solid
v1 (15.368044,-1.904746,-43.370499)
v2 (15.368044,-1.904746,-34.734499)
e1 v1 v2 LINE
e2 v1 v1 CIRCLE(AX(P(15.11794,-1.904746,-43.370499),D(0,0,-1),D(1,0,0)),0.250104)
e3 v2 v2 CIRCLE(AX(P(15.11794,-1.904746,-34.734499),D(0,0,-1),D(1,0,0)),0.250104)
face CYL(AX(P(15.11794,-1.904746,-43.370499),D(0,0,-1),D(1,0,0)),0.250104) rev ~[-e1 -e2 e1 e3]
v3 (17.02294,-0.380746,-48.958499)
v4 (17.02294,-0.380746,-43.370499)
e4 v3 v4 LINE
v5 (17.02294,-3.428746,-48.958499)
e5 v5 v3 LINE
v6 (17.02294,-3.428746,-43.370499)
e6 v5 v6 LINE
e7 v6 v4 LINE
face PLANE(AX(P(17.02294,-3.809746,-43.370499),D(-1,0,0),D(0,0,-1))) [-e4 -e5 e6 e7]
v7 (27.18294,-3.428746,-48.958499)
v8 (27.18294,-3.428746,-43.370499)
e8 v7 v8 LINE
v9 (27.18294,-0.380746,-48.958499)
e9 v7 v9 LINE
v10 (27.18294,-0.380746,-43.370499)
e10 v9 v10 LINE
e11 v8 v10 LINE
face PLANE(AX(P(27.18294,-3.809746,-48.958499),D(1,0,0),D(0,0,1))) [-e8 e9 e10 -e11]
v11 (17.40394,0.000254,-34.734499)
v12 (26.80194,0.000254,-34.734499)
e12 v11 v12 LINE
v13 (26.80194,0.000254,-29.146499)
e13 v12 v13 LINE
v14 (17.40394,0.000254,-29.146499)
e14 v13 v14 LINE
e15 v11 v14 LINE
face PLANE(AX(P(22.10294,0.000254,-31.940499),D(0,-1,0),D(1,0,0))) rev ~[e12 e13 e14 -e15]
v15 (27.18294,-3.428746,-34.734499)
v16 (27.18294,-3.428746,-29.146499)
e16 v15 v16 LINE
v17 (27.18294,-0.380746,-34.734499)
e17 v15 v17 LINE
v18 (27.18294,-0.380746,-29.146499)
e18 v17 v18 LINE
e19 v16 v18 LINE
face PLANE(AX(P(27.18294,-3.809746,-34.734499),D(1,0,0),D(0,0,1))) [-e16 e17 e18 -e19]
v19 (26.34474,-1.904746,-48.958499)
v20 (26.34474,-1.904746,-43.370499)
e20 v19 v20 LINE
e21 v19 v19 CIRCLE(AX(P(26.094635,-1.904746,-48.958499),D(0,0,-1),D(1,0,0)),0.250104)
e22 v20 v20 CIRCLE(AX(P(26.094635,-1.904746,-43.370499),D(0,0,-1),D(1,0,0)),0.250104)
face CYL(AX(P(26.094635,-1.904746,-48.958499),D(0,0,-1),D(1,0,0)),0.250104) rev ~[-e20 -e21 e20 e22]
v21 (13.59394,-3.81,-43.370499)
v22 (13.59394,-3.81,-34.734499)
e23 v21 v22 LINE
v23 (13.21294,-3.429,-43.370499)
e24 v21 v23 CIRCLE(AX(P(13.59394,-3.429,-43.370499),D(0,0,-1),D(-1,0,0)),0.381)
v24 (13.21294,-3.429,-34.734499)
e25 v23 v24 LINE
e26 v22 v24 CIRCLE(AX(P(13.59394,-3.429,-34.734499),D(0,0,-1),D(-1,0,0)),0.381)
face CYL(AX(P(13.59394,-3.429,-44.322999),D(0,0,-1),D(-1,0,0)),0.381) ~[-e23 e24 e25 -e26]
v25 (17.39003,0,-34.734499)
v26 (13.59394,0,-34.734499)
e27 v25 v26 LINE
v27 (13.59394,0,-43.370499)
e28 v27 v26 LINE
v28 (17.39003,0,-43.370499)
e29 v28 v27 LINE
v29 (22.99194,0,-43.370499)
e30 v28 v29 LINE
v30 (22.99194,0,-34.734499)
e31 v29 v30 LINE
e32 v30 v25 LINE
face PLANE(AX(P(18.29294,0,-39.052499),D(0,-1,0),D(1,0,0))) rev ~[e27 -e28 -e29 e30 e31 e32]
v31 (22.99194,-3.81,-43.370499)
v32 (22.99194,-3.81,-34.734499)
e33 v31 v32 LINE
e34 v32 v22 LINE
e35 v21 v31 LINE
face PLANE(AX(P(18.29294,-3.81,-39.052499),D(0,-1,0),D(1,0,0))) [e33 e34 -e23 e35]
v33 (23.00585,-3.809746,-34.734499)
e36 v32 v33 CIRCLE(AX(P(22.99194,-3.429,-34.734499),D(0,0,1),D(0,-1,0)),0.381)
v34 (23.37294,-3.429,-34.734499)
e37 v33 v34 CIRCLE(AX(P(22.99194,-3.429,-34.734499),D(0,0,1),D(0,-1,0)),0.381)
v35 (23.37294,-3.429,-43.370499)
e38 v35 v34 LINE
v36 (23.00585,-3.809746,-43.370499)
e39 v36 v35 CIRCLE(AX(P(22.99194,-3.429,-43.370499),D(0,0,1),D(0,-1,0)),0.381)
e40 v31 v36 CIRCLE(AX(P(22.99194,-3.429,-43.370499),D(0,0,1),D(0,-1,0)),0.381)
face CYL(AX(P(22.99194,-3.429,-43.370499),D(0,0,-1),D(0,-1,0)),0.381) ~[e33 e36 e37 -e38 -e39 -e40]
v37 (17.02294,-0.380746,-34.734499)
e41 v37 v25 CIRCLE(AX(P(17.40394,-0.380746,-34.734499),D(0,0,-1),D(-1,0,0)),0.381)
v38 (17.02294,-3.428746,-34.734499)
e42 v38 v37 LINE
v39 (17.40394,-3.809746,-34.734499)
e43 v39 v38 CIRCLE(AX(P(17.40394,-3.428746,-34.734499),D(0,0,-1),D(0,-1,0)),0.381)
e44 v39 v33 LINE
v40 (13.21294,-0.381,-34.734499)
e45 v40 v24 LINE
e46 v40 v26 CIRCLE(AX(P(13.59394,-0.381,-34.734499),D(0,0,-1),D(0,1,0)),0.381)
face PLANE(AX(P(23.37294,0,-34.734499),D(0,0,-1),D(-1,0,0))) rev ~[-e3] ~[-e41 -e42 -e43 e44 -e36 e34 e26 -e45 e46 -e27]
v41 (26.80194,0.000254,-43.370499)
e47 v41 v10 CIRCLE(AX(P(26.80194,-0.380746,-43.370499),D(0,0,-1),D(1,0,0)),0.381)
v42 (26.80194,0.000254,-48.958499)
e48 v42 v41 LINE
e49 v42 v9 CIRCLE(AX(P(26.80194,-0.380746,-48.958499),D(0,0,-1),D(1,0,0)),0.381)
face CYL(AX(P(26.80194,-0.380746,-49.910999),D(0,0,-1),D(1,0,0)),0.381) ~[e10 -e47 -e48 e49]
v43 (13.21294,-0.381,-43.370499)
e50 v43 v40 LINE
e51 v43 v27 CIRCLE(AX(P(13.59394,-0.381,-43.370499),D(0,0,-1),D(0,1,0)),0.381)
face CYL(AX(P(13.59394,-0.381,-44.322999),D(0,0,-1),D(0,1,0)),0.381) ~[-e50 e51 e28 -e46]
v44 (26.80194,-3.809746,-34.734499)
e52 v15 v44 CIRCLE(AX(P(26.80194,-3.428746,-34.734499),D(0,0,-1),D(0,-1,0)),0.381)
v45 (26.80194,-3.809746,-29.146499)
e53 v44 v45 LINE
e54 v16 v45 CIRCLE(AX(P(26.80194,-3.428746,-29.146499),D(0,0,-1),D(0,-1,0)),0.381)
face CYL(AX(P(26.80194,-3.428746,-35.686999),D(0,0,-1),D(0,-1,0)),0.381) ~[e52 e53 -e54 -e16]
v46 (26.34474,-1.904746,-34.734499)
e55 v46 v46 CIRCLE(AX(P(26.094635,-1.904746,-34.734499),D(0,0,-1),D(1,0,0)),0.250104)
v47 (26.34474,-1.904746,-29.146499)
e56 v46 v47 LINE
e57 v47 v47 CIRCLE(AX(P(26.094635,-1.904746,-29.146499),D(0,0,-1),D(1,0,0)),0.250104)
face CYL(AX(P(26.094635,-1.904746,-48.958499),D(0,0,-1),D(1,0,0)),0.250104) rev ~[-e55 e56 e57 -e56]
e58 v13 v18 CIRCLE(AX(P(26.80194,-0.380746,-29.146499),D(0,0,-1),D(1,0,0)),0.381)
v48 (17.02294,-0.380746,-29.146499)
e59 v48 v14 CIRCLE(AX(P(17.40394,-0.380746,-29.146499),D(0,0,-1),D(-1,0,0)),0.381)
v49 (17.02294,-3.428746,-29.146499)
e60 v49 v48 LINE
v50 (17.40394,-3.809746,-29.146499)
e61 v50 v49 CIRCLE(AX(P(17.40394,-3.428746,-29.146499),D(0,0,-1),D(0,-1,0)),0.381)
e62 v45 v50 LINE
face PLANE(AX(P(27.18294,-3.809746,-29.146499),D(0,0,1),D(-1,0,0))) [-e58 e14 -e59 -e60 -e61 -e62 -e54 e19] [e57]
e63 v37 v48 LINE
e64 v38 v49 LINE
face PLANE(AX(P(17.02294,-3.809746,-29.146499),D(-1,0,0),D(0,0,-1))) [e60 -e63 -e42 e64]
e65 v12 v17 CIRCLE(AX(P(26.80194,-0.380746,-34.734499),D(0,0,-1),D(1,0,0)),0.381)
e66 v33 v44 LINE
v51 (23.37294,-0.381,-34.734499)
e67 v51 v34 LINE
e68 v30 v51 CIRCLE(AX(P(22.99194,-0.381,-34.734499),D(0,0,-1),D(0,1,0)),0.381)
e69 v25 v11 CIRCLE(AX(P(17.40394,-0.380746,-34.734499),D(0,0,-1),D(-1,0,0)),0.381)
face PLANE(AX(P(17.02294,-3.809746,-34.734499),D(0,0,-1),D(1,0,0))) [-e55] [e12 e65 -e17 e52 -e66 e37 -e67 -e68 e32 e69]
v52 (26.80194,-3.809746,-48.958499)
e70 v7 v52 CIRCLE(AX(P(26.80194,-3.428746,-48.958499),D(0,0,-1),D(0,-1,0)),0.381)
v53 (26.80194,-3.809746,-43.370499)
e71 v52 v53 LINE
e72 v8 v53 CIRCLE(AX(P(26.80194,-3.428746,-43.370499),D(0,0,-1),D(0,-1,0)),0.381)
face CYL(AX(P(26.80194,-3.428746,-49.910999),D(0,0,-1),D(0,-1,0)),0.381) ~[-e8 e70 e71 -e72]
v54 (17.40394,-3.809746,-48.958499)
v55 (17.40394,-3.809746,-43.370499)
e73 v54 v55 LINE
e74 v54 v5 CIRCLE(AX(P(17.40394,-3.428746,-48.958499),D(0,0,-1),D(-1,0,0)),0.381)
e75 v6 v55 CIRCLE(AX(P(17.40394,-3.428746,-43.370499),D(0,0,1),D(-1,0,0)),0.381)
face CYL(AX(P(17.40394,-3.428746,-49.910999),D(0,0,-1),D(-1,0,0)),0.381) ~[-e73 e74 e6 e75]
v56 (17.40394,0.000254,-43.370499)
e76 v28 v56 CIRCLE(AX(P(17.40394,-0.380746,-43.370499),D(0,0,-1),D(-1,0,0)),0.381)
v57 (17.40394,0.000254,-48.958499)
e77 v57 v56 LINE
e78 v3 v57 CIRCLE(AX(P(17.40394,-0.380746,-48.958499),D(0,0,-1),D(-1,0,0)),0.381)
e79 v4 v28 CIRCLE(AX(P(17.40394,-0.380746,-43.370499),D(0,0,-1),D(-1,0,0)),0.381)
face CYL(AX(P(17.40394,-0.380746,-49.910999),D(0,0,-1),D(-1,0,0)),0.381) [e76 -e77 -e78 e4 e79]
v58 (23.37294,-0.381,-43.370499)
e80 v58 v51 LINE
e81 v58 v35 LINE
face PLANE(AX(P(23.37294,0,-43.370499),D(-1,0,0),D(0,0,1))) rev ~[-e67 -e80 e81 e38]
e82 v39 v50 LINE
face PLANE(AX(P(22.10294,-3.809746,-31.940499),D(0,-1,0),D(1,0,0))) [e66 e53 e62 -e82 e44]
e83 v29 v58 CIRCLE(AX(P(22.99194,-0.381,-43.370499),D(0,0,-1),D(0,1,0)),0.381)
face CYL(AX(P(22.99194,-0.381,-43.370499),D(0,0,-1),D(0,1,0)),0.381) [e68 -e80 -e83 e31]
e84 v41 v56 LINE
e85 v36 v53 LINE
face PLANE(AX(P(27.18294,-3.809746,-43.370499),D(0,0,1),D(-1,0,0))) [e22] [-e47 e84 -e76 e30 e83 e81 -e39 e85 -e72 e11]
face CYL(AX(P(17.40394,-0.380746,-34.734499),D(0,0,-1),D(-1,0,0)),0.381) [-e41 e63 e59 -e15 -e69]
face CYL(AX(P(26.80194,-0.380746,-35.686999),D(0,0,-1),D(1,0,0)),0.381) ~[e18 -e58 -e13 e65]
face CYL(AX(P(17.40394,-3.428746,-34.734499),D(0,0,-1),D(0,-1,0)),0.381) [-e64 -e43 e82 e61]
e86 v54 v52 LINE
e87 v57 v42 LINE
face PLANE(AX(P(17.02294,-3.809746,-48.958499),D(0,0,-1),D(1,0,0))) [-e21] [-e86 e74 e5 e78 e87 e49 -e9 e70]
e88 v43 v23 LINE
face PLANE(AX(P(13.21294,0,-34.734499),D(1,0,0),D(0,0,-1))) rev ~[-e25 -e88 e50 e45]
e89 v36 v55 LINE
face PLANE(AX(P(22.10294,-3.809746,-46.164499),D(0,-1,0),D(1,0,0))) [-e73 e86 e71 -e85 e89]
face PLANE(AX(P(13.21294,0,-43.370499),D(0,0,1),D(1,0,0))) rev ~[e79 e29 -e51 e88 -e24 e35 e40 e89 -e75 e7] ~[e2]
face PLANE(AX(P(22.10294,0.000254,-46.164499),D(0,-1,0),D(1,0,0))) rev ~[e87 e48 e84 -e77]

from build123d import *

# Parameters (mm, degrees)
F1_DEPTH     = 3.81
F3_START     = -0.000254
F3_DEPTH     = 3.81
F4_R         = 0.2501042953
F5_DEPTH     = 50.8
F6_T1_DEPTH  = 7.493
F6_T3_DEPTH  = 6.5405
F6_T5_DEPTH  = 7.493
F6_T7_DEPTH  = 6.5405
F6_T9_DEPTH  = 8.636
F6_T11_DEPTH = 10.541
F7_R         = 0.2501042953
F8_DEPTH     = 50.8


# Not quite as in the source:
# - a fillet or chamfer that OpenCascade refuses, or shapes differently, is made with other operations: its cross-section is extruded or revolved along the edge and cut away or added


with BuildPart() as f1:
    # F0 (on Front) → F1 (new body)
    with BuildSketch(Plane.XZ):
        Polygon((23.3729397243, -34.7344989846), (17.0229397243, -34.7344989846), (13.2129397243, -34.7344989846), (13.2129397243, -43.3704989846), (17.0229397243, -43.3704989846), (23.3729397243, -43.3704989846), align=None)
    extrude(amount=F1_DEPTH)

    # F2 (on face) → F3 (join)
    with BuildSketch(Plane.XZ.offset(3.81).offset(F3_START)):
        Polygon((27.1829397243, -29.1464989846), (17.0229397243, -29.1464989846), (17.0229397243, -34.7344989846), (23.3729397243, -34.7344989846), (27.1829397243, -34.7344989846), align=None)
        Polygon((27.1829397243, -43.3704989846), (23.3729397243, -43.3704989846), (17.0229397243, -43.3704989846), (17.0229397243, -48.9584989846), (27.1829397243, -48.9584989846), align=None)
    extrude(amount=-F3_DEPTH)

    # F4 (on face) → F5 (cut)
    with BuildSketch(Plane(origin=(0, 0, -48.9584989846), x_dir=(1, 0, 0), z_dir=(0, 0, -1))):
        with Locations((26.094635429, 1.904746)):
            Circle(F4_R)
    extrude(amount=-F5_DEPTH, mode=Mode.SUBTRACT)

    # F6: fillet of radius 0.381 on 12 edges, made by hand

    # F6_s2 → F6_t1 (cut)
    with BuildSketch(Plane.XY.offset(-35.6869989846)):
        with BuildLine():
            ThreePointArc((26.8019397243, -3.809746), (27.071347408, -3.6981536836), (27.1829397243, -3.428746))
            Line((27.1829397243, -3.428746), (27.1829397243, -3.809746))
            Line((27.1829397243, -3.809746), (26.8019397243, -3.809746))
        make_face()
        with BuildLine():
            ThreePointArc((27.1829397243, -0.380746), (27.071347408, -0.1113383164), (26.8019397243, 0.000254))
            Line((26.8019397243, 0.000254), (27.1829397243, 0.000254))
            Line((27.1829397243, 0.000254), (27.1829397243, -0.380746))
        make_face()
    extrude(amount=F6_T1_DEPTH, mode=Mode.SUBTRACT)

    # F6_s4 → F6_t3 (cut)
    with BuildSketch(Plane.XY.offset(-34.7344989846)):
        with BuildLine():
            ThreePointArc((17.4039397243, -3.809746), (17.1345320407, -3.6981536836), (17.0229397243, -3.428746))
            Line((17.0229397243, -3.428746), (17.0229397243, -3.809746))
            Line((17.0229397243, -3.809746), (17.4039397243, -3.809746))
        make_face()
        with BuildLine():
            ThreePointArc((17.0229397243, -0.380746), (17.1345320407, -0.1113383164), (17.4039397243, 0.000254))
            Line((17.4039397243, 0.000254), (17.0229397243, 0.000254))
            Line((17.0229397243, 0.000254), (17.0229397243, -0.380746))
        make_face()
    extrude(amount=F6_T3_DEPTH, mode=Mode.SUBTRACT)

    # F6_s6 → F6_t5 (cut)
    with BuildSketch(Plane.XY.offset(-49.9109989846)):
        with BuildLine():
            ThreePointArc((26.8019397243, -3.809746), (27.071347408, -3.6981536836), (27.1829397243, -3.428746))
            Line((27.1829397243, -3.428746), (27.1829397243, -3.809746))
            Line((27.1829397243, -3.809746), (26.8019397243, -3.809746))
        make_face()
        with BuildLine():
            ThreePointArc((27.1829397243, -0.380746), (27.071347408, -0.1113383164), (26.8019397243, 0.000254))
            Line((26.8019397243, 0.000254), (27.1829397243, 0.000254))
            Line((27.1829397243, 0.000254), (27.1829397243, -0.380746))
        make_face()
    extrude(amount=F6_T5_DEPTH, mode=Mode.SUBTRACT)

    # F6_s8 → F6_t7 (cut)
    with BuildSketch(Plane.XY.offset(-49.9109989846)):
        with BuildLine():
            ThreePointArc((17.0229397243, -3.428746), (17.1345320407, -3.6981536836), (17.4039397243, -3.809746))
            Line((17.4039397243, -3.809746), (17.0229397243, -3.809746))
            Line((17.0229397243, -3.809746), (17.0229397243, -3.428746))
        make_face()
        with BuildLine():
            ThreePointArc((17.0229397243, -0.380746), (17.1345320407, -0.1113383164), (17.4039397243, 0.000254))
            Line((17.4039397243, 0.000254), (17.0229397243, 0.000254))
            Line((17.0229397243, 0.000254), (17.0229397243, -0.380746))
        make_face()
    extrude(amount=F6_T7_DEPTH, mode=Mode.SUBTRACT)

    # F6_s10 → F6_t9 (cut)
    with BuildSketch(Plane.XY.offset(-43.3704989846)):
        with BuildLine():
            ThreePointArc((22.9919397243, -3.81), (23.261347408, -3.6984076836), (23.3729397243, -3.429))
            Line((23.3729397243, -3.429), (23.3729397243, -3.81))
            Line((23.3729397243, -3.81), (22.9919397243, -3.81))
        make_face()
        with BuildLine():
            ThreePointArc((22.9919397243, 0), (23.261347408, -0.1115923164), (23.3729397243, -0.381))
            Line((23.3729397243, -0.381), (23.3729397243, 0))
            Line((23.3729397243, 0), (22.9919397243, 0))
        make_face()
    extrude(amount=F6_T9_DEPTH, mode=Mode.SUBTRACT)

    # F6_s12 → F6_t11 (cut)
    with BuildSketch(Plane.XY.offset(-44.3229989846)):
        with BuildLine():
            ThreePointArc((13.2129397243, -3.429), (13.3245320407, -3.6984076836), (13.5939397243, -3.81))
            Line((13.5939397243, -3.81), (13.2129397243, -3.81))
            Line((13.2129397243, -3.81), (13.2129397243, -3.429))
        make_face()
        with BuildLine():
            ThreePointArc((13.5939397243, 0), (13.3245320407, -0.1115923164), (13.2129397243, -0.381))
            Line((13.2129397243, -0.381), (13.2129397243, 0))
            Line((13.2129397243, 0), (13.5939397243, 0))
        make_face()
    extrude(amount=F6_T11_DEPTH, mode=Mode.SUBTRACT)

    # F7 (on face) → F8 (cut)
    with BuildSketch(Plane(origin=(0, 0, -43.3704989846), x_dir=(1, 0, 0), z_dir=(0, 0, -1))):
        with Locations((15.1179397243, 1.904746)):
            Circle(F7_R)
    extrude(amount=-F8_DEPTH, mode=Mode.SUBTRACT)


solid = f1.part
